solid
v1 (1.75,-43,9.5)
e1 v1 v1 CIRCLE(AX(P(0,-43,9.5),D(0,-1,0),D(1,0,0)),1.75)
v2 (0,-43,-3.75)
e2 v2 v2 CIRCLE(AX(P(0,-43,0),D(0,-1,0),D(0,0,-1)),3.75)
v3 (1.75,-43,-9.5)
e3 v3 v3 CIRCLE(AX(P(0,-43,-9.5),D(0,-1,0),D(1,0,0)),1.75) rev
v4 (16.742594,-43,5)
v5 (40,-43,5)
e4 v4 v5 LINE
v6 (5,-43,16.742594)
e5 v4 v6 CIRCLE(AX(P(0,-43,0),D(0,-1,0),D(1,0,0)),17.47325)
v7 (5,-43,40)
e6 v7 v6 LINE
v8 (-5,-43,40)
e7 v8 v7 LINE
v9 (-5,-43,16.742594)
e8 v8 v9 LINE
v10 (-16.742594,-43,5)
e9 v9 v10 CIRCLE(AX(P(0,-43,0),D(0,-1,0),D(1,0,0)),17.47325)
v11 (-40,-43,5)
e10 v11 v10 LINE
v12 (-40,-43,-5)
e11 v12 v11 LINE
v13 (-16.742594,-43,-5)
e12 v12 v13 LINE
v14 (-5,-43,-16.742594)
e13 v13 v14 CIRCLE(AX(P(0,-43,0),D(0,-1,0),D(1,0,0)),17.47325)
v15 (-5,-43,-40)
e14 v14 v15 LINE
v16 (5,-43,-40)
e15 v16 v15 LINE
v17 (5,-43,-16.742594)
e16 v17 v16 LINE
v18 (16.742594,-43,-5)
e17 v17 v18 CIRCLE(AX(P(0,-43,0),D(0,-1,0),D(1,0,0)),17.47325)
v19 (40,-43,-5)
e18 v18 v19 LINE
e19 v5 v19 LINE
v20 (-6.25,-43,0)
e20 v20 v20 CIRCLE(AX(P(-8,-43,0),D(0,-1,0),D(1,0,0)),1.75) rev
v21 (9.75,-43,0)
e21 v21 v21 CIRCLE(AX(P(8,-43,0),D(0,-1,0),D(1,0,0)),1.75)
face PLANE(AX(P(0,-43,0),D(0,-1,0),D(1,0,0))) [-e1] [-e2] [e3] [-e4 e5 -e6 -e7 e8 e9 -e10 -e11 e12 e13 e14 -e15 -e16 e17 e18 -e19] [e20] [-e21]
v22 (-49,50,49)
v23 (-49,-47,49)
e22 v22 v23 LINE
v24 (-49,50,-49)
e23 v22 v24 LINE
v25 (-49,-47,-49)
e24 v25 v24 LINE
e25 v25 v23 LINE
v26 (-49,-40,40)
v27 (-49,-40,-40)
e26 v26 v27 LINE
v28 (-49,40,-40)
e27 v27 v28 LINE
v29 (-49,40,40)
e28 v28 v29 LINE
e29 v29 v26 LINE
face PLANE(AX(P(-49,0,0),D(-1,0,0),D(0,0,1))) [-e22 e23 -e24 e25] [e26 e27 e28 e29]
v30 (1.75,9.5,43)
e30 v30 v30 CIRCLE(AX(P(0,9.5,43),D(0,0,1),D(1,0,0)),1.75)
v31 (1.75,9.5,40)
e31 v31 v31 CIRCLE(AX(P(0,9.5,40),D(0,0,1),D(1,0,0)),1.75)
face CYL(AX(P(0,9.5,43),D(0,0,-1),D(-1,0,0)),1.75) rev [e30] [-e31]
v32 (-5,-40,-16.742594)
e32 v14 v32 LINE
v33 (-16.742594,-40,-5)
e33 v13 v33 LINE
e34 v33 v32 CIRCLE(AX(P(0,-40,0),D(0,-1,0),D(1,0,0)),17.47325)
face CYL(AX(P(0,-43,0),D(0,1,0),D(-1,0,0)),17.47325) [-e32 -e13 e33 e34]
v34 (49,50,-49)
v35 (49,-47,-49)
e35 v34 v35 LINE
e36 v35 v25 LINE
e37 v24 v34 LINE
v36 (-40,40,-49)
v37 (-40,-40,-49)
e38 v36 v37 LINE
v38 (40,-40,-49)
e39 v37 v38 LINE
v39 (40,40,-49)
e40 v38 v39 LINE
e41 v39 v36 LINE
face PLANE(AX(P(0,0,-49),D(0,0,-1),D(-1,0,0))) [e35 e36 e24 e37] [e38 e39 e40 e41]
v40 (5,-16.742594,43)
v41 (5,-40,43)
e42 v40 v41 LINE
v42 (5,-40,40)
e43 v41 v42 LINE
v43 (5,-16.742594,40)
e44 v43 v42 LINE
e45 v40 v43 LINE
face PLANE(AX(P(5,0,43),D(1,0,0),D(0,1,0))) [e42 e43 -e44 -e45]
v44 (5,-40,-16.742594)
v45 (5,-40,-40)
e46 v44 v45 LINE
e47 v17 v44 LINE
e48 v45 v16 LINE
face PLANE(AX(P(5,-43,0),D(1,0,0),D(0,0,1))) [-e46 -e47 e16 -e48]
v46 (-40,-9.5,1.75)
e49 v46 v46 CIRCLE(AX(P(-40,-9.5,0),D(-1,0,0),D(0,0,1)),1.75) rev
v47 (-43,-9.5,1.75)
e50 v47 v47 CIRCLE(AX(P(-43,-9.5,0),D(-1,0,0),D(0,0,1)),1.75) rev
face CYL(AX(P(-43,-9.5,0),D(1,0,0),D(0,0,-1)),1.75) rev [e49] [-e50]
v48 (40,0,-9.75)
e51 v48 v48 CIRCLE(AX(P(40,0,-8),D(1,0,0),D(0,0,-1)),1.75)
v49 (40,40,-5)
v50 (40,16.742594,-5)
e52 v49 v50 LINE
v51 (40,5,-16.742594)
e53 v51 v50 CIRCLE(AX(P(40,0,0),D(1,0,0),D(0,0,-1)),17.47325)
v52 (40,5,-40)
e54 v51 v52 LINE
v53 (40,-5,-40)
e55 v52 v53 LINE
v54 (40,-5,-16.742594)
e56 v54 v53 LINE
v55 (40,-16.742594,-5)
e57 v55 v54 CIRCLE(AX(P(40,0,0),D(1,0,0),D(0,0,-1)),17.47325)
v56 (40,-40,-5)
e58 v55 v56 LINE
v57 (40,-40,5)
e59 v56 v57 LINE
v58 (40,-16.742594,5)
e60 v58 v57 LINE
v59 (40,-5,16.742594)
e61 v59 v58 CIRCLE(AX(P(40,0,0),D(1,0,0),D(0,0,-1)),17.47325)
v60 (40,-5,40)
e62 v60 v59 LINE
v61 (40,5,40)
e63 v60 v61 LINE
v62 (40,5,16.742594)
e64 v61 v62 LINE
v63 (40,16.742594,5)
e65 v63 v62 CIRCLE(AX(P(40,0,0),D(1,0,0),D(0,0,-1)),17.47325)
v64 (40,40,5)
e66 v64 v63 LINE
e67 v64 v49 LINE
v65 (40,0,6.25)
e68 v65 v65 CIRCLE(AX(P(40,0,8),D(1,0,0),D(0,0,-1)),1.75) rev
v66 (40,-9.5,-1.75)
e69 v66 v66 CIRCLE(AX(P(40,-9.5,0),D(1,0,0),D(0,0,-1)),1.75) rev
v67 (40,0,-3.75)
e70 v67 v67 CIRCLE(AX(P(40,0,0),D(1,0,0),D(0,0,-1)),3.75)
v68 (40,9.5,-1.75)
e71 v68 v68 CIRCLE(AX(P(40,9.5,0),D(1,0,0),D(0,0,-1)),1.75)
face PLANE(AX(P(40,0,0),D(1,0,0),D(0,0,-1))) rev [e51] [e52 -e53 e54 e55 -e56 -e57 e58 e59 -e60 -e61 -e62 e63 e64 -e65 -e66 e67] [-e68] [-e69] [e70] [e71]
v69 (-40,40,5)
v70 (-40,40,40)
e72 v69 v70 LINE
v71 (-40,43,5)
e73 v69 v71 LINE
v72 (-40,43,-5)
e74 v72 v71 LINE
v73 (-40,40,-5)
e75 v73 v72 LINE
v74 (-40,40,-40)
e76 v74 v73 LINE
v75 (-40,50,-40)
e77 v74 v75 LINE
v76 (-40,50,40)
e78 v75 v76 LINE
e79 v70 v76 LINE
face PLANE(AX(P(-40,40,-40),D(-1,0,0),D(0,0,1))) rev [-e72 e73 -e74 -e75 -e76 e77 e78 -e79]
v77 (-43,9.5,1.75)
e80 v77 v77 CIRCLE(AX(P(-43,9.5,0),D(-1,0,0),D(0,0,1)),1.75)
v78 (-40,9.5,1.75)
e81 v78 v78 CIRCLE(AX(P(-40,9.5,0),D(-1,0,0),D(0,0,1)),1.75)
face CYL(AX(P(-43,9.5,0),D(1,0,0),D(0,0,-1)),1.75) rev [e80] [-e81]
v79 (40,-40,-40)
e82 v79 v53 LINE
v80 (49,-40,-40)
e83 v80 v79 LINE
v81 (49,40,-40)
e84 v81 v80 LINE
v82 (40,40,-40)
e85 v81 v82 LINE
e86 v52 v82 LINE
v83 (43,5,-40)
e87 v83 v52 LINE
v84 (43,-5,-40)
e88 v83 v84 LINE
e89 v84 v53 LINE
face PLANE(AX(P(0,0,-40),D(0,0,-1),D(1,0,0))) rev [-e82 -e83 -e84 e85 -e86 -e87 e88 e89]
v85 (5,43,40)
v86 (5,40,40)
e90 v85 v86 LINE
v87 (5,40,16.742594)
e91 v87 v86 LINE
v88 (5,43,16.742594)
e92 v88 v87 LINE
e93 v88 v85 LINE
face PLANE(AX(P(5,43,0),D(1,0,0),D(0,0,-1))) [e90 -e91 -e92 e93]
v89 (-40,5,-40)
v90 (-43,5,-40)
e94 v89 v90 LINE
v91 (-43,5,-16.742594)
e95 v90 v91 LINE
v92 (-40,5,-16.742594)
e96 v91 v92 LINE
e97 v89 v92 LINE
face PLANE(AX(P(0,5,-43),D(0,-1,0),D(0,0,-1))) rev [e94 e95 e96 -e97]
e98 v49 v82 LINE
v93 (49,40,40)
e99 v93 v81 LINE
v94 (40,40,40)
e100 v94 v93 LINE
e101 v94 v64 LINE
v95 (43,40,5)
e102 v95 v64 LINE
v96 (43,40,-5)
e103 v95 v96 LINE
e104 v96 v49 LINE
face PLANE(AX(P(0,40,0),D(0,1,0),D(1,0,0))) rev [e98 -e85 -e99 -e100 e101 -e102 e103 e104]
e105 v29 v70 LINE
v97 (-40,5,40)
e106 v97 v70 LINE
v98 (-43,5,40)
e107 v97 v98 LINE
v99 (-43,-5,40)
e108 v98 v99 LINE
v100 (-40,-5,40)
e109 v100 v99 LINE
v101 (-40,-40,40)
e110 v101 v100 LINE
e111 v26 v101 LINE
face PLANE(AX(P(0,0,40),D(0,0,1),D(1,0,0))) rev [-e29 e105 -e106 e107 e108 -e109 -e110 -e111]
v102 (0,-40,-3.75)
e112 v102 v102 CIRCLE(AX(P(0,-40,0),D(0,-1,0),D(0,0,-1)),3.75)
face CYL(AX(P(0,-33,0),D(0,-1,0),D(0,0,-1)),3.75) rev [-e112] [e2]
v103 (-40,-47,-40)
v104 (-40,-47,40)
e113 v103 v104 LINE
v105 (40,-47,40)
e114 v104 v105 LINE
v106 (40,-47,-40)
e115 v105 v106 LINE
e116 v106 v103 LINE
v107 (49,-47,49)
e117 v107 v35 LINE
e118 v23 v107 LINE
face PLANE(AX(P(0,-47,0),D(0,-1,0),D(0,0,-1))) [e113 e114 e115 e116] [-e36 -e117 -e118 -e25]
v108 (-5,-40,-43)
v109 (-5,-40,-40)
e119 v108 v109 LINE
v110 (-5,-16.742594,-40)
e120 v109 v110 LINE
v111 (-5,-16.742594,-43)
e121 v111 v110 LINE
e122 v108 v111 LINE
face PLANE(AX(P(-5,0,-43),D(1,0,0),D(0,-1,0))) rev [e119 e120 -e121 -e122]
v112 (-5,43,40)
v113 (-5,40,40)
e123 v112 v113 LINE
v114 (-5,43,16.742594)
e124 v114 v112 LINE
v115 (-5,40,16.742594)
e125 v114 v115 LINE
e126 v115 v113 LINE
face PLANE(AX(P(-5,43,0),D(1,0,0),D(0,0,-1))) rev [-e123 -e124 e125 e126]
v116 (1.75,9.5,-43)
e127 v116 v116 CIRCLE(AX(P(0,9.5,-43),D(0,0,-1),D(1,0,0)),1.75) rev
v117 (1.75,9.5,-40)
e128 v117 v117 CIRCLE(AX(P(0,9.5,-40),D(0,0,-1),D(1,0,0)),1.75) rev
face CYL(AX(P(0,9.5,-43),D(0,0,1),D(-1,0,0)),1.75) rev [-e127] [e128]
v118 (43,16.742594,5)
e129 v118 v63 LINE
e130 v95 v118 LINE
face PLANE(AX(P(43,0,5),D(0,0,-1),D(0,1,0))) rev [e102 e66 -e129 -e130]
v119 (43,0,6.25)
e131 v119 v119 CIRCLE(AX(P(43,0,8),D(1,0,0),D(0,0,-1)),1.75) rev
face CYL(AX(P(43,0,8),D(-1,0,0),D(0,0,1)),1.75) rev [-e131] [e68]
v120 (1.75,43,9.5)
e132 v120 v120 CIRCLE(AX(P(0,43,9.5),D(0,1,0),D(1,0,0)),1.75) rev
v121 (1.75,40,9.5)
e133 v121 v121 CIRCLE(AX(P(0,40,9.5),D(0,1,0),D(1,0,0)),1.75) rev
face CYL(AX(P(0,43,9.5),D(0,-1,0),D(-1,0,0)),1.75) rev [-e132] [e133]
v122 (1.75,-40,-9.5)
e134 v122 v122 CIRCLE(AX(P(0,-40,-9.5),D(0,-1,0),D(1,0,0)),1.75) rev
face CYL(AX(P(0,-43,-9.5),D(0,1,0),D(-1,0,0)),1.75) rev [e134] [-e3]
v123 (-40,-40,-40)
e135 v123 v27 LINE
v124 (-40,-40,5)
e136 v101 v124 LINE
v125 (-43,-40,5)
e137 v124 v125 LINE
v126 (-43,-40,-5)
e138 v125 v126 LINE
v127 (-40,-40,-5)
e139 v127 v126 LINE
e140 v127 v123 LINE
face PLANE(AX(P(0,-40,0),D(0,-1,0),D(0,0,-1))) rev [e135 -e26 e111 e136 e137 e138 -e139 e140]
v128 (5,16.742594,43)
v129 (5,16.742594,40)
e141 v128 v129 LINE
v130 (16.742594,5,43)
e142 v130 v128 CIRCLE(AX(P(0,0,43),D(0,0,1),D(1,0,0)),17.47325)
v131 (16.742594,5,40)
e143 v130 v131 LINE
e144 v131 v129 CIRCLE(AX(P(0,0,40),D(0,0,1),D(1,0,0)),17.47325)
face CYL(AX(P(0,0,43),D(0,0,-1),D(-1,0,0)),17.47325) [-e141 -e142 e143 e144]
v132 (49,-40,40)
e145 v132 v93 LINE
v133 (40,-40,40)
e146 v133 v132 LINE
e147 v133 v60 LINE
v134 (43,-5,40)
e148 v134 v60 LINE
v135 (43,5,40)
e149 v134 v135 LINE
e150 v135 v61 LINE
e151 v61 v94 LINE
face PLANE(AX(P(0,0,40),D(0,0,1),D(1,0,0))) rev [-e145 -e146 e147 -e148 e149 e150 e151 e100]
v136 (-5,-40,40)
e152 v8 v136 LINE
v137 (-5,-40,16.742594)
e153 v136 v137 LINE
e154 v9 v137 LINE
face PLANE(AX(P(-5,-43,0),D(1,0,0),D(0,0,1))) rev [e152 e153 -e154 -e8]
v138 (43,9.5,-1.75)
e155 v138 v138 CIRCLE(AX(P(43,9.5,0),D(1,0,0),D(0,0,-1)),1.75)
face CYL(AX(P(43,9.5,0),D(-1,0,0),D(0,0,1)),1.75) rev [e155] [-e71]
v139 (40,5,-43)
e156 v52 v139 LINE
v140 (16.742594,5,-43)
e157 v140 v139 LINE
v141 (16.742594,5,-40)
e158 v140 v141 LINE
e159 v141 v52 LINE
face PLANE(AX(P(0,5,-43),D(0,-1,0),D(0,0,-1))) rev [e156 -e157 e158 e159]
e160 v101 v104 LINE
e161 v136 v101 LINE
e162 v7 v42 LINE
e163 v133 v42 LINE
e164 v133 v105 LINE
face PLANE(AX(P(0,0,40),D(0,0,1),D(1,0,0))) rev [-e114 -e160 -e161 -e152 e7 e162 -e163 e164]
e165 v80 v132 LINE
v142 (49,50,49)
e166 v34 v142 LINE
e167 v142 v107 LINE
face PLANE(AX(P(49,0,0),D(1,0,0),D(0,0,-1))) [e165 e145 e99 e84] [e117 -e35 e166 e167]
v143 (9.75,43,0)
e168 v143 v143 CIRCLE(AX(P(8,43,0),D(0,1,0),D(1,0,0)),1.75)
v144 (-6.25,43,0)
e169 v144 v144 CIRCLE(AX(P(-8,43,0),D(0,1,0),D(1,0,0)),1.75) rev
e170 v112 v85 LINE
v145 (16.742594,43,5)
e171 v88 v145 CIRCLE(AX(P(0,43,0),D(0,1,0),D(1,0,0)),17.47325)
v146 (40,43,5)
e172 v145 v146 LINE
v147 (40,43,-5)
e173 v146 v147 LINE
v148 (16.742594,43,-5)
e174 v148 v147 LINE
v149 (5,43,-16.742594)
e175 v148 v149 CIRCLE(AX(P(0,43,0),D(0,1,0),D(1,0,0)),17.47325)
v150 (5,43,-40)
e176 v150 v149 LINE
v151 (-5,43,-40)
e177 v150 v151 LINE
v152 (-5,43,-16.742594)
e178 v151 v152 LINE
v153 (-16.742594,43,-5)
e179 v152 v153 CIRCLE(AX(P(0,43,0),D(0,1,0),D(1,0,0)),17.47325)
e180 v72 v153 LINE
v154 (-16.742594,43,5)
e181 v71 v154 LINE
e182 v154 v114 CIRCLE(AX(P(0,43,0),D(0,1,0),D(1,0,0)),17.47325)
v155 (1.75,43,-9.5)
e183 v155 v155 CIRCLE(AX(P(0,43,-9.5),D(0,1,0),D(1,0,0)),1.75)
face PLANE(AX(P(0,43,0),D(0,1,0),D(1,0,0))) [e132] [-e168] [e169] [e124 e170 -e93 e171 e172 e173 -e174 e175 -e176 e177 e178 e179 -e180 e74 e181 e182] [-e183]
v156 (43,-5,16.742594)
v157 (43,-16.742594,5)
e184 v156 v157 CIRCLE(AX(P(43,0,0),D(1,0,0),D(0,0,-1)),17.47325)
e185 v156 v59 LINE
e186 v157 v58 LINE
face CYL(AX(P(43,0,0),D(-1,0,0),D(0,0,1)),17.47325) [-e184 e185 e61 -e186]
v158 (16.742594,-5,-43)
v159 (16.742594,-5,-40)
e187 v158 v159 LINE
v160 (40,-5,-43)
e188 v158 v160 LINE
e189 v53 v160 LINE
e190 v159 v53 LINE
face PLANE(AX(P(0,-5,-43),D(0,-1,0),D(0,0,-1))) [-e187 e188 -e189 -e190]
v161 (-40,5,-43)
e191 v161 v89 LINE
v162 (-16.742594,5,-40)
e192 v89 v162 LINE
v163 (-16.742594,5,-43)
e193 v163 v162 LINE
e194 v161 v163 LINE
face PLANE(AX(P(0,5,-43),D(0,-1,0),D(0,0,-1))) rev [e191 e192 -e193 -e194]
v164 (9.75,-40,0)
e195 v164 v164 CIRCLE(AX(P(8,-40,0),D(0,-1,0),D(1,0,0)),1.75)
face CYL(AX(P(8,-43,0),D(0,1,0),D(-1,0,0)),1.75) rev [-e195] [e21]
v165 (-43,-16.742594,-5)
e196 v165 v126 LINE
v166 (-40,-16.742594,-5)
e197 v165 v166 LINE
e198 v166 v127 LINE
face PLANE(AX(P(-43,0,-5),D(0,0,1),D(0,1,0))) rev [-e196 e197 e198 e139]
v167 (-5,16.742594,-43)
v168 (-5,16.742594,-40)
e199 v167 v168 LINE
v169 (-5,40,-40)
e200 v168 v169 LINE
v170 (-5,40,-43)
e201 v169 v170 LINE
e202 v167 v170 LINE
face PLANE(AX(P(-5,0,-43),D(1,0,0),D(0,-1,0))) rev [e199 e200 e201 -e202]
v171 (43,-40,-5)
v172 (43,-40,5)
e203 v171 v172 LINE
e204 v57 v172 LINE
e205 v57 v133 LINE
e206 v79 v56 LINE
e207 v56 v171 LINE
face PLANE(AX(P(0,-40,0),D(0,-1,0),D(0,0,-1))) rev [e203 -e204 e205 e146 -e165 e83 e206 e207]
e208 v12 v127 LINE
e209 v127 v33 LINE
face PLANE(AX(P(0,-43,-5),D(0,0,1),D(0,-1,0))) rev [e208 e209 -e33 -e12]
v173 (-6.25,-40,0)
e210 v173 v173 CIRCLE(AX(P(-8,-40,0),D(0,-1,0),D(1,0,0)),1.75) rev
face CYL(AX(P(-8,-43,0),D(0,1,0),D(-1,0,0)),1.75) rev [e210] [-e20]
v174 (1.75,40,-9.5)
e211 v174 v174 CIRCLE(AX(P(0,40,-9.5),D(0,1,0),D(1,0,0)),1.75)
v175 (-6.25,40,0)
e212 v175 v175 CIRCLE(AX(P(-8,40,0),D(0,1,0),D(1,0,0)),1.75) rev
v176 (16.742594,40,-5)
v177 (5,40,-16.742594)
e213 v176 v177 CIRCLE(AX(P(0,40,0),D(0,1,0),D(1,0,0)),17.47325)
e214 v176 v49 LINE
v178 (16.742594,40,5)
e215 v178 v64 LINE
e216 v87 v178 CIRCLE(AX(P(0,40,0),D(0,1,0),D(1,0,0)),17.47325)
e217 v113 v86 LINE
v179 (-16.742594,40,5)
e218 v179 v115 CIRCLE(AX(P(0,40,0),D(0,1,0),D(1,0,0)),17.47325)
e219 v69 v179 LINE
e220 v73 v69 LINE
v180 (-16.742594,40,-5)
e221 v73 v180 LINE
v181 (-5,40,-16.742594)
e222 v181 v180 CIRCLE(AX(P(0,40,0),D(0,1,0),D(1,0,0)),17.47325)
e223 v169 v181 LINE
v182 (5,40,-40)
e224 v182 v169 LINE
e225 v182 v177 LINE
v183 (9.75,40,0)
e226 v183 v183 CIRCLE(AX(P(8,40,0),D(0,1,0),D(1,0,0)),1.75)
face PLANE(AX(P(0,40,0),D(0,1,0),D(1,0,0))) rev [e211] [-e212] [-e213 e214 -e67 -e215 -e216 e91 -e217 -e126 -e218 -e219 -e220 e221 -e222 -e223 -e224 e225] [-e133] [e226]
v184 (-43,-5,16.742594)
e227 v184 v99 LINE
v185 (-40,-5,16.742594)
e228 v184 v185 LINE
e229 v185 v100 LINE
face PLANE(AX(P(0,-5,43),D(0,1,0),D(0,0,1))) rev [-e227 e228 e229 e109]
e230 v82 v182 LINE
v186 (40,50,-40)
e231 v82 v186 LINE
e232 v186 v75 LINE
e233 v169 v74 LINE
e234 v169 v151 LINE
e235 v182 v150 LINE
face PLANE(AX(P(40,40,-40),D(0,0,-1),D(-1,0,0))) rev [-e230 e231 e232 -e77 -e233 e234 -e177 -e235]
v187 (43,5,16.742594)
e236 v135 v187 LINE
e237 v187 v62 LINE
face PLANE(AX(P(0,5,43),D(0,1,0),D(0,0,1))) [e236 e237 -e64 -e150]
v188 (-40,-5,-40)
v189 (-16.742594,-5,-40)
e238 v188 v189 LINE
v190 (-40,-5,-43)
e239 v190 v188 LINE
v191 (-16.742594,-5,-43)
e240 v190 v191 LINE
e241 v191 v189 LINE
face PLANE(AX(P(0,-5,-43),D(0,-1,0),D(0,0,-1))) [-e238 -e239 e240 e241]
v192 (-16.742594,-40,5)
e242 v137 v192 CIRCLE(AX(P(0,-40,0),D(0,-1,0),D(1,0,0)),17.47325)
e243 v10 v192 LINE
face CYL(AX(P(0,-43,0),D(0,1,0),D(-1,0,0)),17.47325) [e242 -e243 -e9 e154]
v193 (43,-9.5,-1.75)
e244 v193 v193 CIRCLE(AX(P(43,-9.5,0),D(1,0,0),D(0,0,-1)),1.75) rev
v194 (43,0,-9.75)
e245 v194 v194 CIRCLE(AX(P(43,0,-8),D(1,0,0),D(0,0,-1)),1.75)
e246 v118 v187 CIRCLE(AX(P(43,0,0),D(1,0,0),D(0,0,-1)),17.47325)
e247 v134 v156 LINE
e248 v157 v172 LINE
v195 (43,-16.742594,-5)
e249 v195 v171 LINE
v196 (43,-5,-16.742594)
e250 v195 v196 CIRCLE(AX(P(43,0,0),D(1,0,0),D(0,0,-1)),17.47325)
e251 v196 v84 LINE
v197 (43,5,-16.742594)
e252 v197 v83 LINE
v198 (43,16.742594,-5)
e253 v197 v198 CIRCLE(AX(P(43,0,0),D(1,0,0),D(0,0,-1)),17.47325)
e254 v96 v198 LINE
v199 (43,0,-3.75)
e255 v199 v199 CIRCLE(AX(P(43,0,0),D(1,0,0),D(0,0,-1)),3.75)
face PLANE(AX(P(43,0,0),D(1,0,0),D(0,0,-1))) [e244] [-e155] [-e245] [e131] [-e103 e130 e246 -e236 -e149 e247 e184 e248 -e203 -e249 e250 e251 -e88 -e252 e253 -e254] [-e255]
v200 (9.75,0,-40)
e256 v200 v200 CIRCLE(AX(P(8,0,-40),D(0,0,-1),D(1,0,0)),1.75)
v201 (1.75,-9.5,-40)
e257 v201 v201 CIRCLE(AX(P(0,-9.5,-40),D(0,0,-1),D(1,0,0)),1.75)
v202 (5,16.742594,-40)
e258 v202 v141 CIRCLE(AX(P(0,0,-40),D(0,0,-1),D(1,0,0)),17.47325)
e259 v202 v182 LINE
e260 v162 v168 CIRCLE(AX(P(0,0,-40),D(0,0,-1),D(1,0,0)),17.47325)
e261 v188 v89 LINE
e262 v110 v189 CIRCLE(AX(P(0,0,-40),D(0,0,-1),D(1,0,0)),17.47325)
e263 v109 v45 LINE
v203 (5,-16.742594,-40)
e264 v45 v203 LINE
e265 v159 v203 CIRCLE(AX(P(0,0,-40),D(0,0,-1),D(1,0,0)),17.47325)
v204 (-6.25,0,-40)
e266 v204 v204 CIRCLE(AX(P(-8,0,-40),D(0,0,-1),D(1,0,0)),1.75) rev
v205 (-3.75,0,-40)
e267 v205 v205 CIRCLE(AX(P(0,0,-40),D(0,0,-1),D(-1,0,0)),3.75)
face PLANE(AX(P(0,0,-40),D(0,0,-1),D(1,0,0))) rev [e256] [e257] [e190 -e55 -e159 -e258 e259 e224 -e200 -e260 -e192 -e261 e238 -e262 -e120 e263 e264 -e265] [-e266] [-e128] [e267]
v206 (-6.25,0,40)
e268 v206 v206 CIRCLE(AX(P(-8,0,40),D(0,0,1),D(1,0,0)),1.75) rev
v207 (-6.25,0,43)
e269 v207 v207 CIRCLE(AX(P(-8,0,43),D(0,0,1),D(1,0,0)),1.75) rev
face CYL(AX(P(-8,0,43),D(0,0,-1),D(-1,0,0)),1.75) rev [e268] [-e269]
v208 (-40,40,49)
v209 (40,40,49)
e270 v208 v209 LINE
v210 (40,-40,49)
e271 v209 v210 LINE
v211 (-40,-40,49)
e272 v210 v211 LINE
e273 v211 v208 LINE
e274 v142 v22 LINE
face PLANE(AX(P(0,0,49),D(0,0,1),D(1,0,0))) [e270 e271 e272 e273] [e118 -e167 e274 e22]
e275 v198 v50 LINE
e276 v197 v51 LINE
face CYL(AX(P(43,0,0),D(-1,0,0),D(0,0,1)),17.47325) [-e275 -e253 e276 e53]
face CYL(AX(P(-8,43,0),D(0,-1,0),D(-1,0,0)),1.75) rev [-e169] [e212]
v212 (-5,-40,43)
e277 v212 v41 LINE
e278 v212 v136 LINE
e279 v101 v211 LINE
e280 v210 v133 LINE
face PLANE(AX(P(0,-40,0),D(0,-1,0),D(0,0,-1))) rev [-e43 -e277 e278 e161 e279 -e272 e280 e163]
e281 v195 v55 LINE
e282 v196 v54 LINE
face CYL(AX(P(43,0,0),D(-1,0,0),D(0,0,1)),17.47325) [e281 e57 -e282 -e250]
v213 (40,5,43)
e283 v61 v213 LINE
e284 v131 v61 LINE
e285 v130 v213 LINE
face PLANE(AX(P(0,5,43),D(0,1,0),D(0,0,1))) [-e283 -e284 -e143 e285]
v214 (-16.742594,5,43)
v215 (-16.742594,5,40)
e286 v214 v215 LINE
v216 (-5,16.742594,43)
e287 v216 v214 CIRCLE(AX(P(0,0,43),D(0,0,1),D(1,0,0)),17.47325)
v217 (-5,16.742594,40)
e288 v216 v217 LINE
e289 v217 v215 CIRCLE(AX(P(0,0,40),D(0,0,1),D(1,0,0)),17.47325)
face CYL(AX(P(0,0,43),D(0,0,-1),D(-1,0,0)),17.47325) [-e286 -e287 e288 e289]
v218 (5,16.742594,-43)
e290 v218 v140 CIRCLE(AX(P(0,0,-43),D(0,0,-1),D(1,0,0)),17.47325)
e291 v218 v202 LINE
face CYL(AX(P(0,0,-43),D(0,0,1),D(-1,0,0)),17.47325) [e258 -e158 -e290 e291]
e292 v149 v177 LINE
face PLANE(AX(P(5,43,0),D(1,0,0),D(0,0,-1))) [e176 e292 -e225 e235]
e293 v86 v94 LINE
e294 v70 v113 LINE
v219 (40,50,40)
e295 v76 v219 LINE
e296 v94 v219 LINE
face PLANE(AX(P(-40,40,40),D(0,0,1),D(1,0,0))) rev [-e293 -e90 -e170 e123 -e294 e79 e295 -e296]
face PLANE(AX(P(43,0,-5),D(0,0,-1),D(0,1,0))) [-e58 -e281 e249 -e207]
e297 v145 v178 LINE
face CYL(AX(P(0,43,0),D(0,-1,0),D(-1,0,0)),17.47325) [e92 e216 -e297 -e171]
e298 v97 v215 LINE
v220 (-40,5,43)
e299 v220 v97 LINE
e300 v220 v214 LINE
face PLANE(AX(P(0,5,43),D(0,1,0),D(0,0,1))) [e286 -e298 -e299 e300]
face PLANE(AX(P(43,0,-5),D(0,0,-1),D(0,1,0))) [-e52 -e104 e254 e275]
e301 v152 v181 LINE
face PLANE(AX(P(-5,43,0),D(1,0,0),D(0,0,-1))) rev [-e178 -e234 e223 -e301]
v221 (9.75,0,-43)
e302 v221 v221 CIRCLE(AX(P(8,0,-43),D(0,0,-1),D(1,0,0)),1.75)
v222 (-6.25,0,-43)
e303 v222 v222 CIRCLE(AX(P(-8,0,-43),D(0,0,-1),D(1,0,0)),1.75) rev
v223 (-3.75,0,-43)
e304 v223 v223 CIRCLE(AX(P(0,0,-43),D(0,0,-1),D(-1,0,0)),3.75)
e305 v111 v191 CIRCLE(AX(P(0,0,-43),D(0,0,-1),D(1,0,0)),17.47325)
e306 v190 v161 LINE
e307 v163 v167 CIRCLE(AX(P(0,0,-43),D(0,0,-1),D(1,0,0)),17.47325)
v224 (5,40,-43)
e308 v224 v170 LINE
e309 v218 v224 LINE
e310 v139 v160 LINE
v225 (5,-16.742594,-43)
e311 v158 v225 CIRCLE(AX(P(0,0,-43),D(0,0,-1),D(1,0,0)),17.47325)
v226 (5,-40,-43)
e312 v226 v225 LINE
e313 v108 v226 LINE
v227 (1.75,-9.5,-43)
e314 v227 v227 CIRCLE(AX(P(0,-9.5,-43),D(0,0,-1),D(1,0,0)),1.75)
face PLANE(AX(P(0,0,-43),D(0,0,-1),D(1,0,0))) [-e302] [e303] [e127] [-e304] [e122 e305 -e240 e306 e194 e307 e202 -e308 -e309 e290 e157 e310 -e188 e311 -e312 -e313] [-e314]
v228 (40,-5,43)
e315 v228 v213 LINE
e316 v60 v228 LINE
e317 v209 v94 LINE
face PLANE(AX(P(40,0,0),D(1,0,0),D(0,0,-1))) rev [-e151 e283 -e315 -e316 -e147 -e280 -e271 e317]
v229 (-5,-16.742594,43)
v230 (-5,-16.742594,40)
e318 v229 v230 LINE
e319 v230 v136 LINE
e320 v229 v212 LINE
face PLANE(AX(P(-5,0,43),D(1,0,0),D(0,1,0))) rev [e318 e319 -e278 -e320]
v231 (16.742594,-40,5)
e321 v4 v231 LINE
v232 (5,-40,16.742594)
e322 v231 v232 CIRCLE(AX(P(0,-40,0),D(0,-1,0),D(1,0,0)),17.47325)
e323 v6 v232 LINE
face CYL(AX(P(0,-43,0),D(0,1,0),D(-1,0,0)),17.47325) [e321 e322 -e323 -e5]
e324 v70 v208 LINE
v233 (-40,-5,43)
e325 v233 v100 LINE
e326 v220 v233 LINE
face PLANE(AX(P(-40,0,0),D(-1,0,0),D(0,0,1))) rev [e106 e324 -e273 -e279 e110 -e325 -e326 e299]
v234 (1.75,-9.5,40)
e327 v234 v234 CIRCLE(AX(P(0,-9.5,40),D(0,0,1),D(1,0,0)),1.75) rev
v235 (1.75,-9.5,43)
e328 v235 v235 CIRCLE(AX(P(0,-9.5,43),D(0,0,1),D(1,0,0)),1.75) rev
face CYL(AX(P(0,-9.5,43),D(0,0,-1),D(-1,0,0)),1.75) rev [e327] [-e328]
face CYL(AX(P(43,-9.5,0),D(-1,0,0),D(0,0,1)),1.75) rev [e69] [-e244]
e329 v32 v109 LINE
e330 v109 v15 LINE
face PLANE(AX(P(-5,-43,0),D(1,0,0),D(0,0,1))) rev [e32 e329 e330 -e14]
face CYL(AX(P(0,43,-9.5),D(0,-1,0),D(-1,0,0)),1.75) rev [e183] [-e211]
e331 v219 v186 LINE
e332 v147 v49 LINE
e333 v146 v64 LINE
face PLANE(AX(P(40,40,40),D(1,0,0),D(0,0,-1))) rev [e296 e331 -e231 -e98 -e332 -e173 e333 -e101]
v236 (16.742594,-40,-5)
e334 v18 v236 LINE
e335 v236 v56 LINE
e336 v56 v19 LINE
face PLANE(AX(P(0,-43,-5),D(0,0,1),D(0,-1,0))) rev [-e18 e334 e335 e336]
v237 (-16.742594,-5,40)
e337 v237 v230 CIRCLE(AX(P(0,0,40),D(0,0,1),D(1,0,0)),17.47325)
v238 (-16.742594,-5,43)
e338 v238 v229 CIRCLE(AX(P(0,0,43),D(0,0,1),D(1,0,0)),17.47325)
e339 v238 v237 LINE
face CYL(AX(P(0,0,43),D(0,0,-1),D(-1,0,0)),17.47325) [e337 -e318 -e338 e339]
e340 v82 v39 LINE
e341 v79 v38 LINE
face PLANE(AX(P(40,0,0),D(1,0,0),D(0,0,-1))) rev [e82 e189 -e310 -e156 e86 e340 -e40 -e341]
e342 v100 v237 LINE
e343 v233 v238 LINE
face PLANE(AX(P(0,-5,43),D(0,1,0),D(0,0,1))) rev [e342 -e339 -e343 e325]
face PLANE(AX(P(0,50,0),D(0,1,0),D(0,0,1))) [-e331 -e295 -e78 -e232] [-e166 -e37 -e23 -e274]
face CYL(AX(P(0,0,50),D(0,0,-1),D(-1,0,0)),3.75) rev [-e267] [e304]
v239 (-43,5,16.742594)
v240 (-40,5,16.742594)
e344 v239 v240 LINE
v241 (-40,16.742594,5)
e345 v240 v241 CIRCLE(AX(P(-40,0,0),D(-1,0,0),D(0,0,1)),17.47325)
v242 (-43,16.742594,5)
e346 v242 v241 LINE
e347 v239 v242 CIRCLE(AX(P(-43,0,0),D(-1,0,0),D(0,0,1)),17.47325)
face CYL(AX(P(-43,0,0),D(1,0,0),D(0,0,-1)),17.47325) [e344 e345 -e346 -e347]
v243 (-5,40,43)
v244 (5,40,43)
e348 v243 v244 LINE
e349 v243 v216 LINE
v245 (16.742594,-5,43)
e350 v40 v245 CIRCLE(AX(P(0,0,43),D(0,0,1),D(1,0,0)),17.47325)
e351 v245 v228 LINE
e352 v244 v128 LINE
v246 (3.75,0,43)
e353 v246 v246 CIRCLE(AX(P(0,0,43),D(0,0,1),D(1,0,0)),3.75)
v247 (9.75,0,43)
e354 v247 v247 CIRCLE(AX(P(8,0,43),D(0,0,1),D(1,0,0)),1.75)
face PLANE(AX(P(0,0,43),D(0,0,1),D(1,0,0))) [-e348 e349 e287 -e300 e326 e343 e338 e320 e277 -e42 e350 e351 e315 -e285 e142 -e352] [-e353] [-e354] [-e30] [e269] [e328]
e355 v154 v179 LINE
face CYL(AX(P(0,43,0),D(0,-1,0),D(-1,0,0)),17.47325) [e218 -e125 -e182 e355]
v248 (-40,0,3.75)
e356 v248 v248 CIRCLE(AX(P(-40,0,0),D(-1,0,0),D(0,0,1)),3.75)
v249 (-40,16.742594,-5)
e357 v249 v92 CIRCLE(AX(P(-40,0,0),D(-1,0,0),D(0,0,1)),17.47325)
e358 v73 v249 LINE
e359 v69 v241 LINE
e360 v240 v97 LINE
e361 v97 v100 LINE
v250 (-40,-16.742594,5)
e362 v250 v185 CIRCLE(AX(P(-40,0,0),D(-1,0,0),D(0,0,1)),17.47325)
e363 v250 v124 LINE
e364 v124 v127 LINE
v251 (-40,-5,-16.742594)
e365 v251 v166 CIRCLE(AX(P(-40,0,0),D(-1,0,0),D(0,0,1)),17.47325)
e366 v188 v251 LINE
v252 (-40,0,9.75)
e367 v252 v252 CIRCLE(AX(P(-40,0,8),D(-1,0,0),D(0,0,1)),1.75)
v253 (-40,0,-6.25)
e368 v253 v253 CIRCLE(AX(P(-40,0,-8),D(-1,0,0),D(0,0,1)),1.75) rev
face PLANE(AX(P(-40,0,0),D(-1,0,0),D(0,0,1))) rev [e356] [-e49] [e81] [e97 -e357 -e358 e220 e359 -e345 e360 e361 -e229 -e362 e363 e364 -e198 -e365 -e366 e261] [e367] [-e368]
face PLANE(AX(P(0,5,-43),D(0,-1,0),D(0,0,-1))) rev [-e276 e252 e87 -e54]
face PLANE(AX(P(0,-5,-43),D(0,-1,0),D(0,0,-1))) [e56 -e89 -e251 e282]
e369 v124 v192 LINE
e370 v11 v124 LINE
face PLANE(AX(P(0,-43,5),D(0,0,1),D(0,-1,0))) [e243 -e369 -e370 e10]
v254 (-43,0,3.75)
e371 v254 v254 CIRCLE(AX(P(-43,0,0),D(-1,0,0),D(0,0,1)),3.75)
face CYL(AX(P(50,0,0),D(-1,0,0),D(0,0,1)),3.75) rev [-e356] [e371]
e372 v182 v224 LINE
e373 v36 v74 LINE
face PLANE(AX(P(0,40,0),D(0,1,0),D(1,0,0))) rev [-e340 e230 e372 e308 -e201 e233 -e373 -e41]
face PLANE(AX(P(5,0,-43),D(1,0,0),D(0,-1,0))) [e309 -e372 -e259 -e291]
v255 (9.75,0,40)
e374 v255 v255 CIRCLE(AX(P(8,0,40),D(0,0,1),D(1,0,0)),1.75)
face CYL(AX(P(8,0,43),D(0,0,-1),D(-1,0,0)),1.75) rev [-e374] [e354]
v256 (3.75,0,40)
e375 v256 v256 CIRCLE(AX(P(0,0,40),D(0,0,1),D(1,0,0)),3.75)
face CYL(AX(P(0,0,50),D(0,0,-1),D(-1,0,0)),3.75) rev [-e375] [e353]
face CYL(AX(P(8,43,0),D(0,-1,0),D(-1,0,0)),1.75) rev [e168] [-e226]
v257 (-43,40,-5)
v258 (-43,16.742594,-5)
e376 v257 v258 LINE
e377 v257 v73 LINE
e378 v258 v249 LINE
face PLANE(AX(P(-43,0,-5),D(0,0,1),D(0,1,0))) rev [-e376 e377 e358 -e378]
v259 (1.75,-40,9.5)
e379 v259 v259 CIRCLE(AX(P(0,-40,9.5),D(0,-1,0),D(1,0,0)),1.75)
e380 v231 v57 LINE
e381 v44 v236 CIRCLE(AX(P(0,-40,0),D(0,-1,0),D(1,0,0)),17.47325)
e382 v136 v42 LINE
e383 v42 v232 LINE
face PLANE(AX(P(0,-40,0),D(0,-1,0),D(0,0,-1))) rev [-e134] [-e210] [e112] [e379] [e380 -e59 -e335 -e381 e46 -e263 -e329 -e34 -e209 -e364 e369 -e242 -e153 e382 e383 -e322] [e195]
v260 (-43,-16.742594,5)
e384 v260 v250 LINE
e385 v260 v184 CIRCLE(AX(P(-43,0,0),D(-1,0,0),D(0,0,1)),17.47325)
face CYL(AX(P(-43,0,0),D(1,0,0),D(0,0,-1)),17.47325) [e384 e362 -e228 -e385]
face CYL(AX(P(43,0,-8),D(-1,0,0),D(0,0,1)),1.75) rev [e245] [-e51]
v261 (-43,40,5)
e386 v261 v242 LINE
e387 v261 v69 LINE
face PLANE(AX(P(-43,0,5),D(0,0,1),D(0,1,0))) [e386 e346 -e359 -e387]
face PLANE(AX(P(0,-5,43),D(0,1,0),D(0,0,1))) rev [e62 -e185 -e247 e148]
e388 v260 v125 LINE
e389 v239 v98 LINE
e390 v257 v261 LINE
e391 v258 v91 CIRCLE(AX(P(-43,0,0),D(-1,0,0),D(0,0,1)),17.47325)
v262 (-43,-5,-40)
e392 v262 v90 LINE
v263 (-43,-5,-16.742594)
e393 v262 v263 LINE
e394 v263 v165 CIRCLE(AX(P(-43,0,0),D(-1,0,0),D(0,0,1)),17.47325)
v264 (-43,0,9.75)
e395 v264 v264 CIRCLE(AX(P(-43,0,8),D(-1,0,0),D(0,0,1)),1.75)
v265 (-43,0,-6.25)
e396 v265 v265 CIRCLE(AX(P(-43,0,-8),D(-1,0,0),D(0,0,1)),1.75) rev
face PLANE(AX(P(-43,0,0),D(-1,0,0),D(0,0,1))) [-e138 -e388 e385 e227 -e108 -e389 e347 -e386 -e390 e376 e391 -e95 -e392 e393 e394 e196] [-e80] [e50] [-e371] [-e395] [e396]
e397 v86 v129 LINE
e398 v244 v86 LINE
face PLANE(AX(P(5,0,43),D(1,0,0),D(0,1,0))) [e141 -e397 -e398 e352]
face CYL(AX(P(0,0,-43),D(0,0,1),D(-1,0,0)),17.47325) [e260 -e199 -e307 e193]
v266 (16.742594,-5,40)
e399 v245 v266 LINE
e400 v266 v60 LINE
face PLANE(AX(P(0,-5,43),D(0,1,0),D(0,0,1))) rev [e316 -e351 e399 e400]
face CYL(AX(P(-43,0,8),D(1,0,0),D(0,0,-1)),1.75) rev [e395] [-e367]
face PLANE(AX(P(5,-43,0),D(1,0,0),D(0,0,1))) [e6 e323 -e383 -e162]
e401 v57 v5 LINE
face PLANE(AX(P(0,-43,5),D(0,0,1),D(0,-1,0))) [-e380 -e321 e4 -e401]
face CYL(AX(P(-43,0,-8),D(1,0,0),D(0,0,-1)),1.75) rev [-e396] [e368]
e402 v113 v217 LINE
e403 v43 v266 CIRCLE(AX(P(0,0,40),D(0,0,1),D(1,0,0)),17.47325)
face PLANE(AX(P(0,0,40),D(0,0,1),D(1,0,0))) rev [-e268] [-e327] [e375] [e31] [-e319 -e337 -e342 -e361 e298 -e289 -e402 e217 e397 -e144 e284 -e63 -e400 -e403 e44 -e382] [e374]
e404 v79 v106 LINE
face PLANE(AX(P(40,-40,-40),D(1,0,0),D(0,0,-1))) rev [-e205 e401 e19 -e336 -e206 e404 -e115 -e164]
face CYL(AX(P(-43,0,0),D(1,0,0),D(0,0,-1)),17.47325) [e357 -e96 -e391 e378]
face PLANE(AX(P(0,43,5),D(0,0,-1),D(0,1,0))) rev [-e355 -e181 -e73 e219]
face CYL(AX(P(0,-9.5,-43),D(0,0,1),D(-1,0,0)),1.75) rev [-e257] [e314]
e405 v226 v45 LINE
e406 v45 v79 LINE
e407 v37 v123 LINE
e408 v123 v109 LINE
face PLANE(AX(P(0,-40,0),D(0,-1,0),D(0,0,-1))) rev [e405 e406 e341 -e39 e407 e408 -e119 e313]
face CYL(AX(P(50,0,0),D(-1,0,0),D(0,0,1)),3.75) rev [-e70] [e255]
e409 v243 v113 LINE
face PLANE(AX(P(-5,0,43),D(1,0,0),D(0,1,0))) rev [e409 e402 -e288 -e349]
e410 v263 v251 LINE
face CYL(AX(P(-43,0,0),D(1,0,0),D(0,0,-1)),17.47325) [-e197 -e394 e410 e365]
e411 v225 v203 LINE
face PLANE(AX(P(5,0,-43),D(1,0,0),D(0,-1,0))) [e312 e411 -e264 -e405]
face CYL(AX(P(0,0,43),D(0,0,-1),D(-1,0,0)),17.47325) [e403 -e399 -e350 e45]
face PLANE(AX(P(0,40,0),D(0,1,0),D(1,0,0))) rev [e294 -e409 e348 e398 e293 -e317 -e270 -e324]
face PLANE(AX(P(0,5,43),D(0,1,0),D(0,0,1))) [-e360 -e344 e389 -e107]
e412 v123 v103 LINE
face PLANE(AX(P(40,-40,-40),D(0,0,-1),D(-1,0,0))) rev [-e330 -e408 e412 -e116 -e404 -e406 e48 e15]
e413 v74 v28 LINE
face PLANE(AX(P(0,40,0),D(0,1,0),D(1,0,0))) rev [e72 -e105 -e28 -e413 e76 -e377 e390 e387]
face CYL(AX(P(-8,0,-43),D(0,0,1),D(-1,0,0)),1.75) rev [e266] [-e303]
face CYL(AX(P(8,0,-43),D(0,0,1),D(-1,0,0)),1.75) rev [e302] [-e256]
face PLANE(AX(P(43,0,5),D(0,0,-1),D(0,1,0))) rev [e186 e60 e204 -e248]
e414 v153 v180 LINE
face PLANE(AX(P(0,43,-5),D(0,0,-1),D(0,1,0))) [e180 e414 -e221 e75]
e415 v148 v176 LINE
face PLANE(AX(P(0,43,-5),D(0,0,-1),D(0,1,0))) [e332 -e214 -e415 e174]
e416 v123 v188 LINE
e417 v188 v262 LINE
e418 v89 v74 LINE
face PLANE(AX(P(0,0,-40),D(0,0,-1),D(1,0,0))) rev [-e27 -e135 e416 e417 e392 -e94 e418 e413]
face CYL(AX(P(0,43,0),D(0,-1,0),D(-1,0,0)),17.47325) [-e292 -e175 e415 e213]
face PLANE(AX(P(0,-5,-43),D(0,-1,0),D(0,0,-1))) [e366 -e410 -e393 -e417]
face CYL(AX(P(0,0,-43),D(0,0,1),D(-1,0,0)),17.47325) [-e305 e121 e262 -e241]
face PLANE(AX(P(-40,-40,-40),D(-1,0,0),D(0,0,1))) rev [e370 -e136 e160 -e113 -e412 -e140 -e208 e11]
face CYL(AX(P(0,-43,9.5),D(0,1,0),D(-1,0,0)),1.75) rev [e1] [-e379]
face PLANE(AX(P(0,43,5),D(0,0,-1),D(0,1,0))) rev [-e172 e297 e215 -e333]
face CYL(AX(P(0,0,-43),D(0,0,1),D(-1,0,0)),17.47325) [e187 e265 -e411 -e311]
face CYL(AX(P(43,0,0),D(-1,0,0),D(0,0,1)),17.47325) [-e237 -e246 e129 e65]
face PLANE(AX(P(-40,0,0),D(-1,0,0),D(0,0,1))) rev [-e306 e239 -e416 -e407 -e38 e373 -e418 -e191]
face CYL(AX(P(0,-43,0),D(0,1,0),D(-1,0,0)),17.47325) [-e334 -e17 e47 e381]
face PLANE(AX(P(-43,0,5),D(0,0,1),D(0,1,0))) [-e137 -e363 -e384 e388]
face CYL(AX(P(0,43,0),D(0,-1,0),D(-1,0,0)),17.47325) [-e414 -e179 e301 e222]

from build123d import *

# Parameters (mm, degrees)
SKETCH2_R                  = 1.75
SKETCH2_W                  = 10
SKETCH2_H                  = 10
BOSS_EXTRUDE1_DEPTH        = 3
CIRPATTERN1_COUNT          = 4
CIRPATTERN2_START          = 40
CIRPATTERN2_OUTLINE_R      = 1.75
CIRPATTERN2_DEPTH          = 3
CIRPATTERN2_START_2        = -43
CIRPATTERN2_2_OUTLINE_R    = 1.75
CIRPATTERN2_2_DEPTH        = 3
CIRPATTERN2_3_OUTLINE_R    = 1.75
CIRPATTERN2_3_DEPTH        = 3
CIRPATTERN2_4_OUTLINE_R    = 1.75
CIRPATTERN2_4_DEPTH        = 3
BOSS_EXTRUDE2_DEPTH        = 50
BOSS_EXTRUDE2_DEPTH_BACK   = 50
SKETCH3_W                  = 10
SKETCH3_H                  = 10
BOSS_EXTRUDE2_2_DEPTH      = 50
BOSS_EXTRUDE2_2_DEPTH_BACK = 50
BOSS_EXTRUDE2_3_DEPTH      = 50
BOSS_EXTRUDE2_3_DEPTH_BACK = 50
BOSS_EXTRUDE2_4_DEPTH      = 50
BOSS_EXTRUDE2_4_DEPTH_BACK = 50
SKETCH4_W                  = 100
SKETCH4_H                  = 100
SKETCH4_W_2                = 80
SKETCH4_H_2                = 80
BOSS_EXTRUDE3_DEPTH        = 10
SKETCH5_W                  = 100
SKETCH5_H                  = 100
SKETCH5_W_2                = 80
SKETCH5_H_2                = 80
BOSS_EXTRUDE4_DEPTH        = 10
SKETCH7_R                  = 3.75
CUT_EXTRUDE2_DEPTH         = 10
SKETCH8_R                  = 3.75
CUT_EXTRUDE3_DEPTH         = 117.828934772
SKETCH9_R                  = 3.75
CUT_EXTRUDE4_DEPTH         = 117.828934772
SKETCH10_W                 = 100
SKETCH10_H                 = 100
CUT_EXTRUDE5_DEPTH         = 3
SKETCH11_W                 = 100
SKETCH11_H                 = 97
CUT_EXTRUDE6_DEPTH         = 1
SKETCH12_W                 = 99
SKETCH12_H                 = 97
CUT_EXTRUDE7_DEPTH         = 1
SKETCH13_W                 = 99
SKETCH13_H                 = 97
CUT_EXTRUDE8_DEPTH         = 1
SKETCH14_W                 = 98
SKETCH14_H                 = 97
CUT_EXTRUDE9_DEPTH         = 1


# Read off the part's stored shape, not the designer's step: CirPattern2
with BuildPart() as part:
    # Sketch2 → Boss-Extrude1 (new body)
    # profile 1 of 13: a face of its own
    with BuildSketch(Plane.XY.offset(40)):
        with BuildLine():
            ThreePointArc((5, -16.74259435), (0, -17.47325), (-5, -16.74259435))
            Line((-5, -16.74259435), (-5, -50))
            Line((-5, -50), (5, -50))
            Line((5, -50), (5, -16.74259435))
        make_face()
    # profile 2 of 13: a face of its own
    with BuildSketch(Plane.XY.offset(40)):
        with BuildLine():
            Line((5, -5), (-5, -5))
            Line((-5, -5), (-5, -16.74259435))
            ThreePointArc((-5, -16.74259435), (0, -17.47325), (5, -16.74259435))
            Line((5, -16.74259435), (5, -5))
        make_face()
        with Locations((0, -9.5)):
            Circle(SKETCH2_R, mode=Mode.SUBTRACT)
    # profile 3 of 13: a face of its own
    with BuildSketch(Plane.XY.offset(40)):
        with BuildLine():
            Line((16.74259435, -5), (5, -5))
            Line((5, -5), (5, -16.74259435))
            ThreePointArc((5, -16.74259435), (12.355453564, -12.355453564), (16.74259435, -5))
        make_face()
    # profile 4 of 13: a face of its own
    with BuildSketch(Plane.XY.offset(40)):
        with BuildLine():
            Line((5, 5), (5, -5))
            Line((5, -5), (16.74259435, -5))
            ThreePointArc((16.74259435, -5), (17.289621197, -2.526551883), (17.47325, 0))
            ThreePointArc((17.47325, 0), (17.289621197, 2.526551883), (16.74259435, 5))
            Line((16.74259435, 5), (5, 5))
        make_face()
        with Locations((8, 0)):
            Circle(SKETCH2_R, mode=Mode.SUBTRACT)
    # profile 5 of 13: a face of its own
    with BuildSketch(Plane.XY.offset(40)):
        Rectangle(SKETCH2_W, SKETCH2_H)
    # profile 6 of 13: a face of its own
    with BuildSketch(Plane.XY.offset(40)):
        with BuildLine():
            Line((-5, -5), (-16.74259435, -5))
            ThreePointArc((-16.74259435, -5), (-12.355453564, -12.355453564), (-5, -16.74259435))
            Line((-5, -16.74259435), (-5, -5))
        make_face()
    # profile 7 of 13: a face of its own
    with BuildSketch(Plane.XY.offset(40)):
        with BuildLine():
            ThreePointArc((-16.74259435, 5), (-17.47325, 0), (-16.74259435, -5))
            Line((-16.74259435, -5), (-5, -5))
            Line((-5, -5), (-5, 5))
            Line((-5, 5), (-16.74259435, 5))
        make_face()
        with Locations((-8, 0)):
            Circle(SKETCH2_R, mode=Mode.SUBTRACT)
    # profile 8 of 13: a face of its own
    with BuildSketch(Plane.XY.offset(40)):
        with BuildLine():
            ThreePointArc((-5, 16.74259435), (-12.355453564, 12.355453564), (-16.74259435, 5))
            Line((-16.74259435, 5), (-5, 5))
            Line((-5, 5), (-5, 16.74259435))
        make_face()
    # profile 9 of 13: a face of its own
    with BuildSketch(Plane.XY.offset(40)):
        with BuildLine():
            Line((-5, 16.74259435), (-5, 5))
            Line((-5, 5), (5, 5))
            Line((5, 5), (5, 16.74259435))
            ThreePointArc((5, 16.74259435), (0, 17.47325), (-5, 16.74259435))
        make_face()
        with Locations((0, 9.5)):
            Circle(SKETCH2_R, mode=Mode.SUBTRACT)
    # profile 10 of 13: a face of its own
    with BuildSketch(Plane.XY.offset(40)):
        with BuildLine():
            Line((5, 16.74259435), (5, 5))
            Line((5, 5), (16.74259435, 5))
            ThreePointArc((16.74259435, 5), (12.355453564, 12.355453564), (5, 16.74259435))
        make_face()
    # profile 11 of 13: a face of its own
    with BuildSketch(Plane.XY.offset(40)):
        with BuildLine():
            ThreePointArc((17.47325, 0), (17.289621197, -2.526551883), (16.74259435, -5))
            Line((16.74259435, -5), (50, -5))
            Line((50, -5), (50, 5))
            Line((50, 5), (16.74259435, 5))
            ThreePointArc((16.74259435, 5), (17.289621197, 2.526551883), (17.47325, 0))
        make_face()
    # profile 12 of 13: a face of its own
    with BuildSketch(Plane.XY.offset(40)):
        with BuildLine():
            Line((-50, 5), (-50, -5))
            Line((-50, -5), (-16.74259435, -5))
            ThreePointArc((-16.74259435, -5), (-17.47325, 0), (-16.74259435, 5))
            Line((-16.74259435, 5), (-50, 5))
        make_face()
    # profile 13 of 13: a face of its own
    with BuildSketch(Plane.XY.offset(40)):
        with BuildLine():
            Line((-5, 50), (-5, 16.74259435))
            ThreePointArc((-5, 16.74259435), (0, 17.47325), (5, 16.74259435))
            Line((5, 16.74259435), (5, 50))
            Line((5, 50), (-5, 50))
        make_face()
    extrude(amount=BOSS_EXTRUDE1_DEPTH)


with BuildPart() as cirpattern1_1:
    # CirPattern1: pattern copy
    add(part.part.rotate(Axis((0, 0, 0), (1, 0, 0)), 1 * 360 / CIRPATTERN1_COUNT))


with BuildPart() as cirpattern1_2:
    # CirPattern1: pattern copy
    add(part.part.rotate(Axis((0, 0, 0), (1, 0, 0)), 2 * 360 / CIRPATTERN1_COUNT))


with BuildPart() as cirpattern1_3:
    # CirPattern1: pattern copy
    add(part.part.rotate(Axis((0, 0, 0), (1, 0, 0)), 3 * 360 / CIRPATTERN1_COUNT))


with BuildPart() as body_5:
    # CirPattern2 outline → CirPattern2 (new body)
    with BuildSketch(Plane.XY.offset(CIRPATTERN2_START)):
        with BuildLine():
            ThreePointArc((5, -16.74259435), (12.355453564, -12.355453564), (16.74259435, -5))
            Line((16.74259435, -5), (50, -5))
            Line((50, -5), (50, 5))
            Line((50, 5), (16.74259435, 5))
            ThreePointArc((16.74259435, 5), (12.355453564, 12.355453564), (5, 16.74259435))
            Line((5, 16.74259435), (5, 50))
            Line((5, 50), (-5, 50))
            Line((-5, 50), (-5, 16.74259435))
            ThreePointArc((-5, 16.74259435), (-12.355453564, 12.355453564), (-16.74259435, 5))
            Line((-16.74259435, 5), (-50, 5))
            Line((-50, 5), (-50, -5))
            Line((-50, -5), (-16.74259435, -5))
            ThreePointArc((-16.74259435, -5), (-12.355453564, -12.355453564), (-5, -16.74259435))
            Line((-5, -16.74259435), (-5, -50))
            Line((-5, -50), (5, -50))
            Line((5, -50), (5, -16.74259435))
        make_face()
        with Locations((0, -9.5)):
            Circle(CIRPATTERN2_OUTLINE_R, mode=Mode.SUBTRACT)
        with Locations((-8, 0)):
            Circle(CIRPATTERN2_OUTLINE_R, mode=Mode.SUBTRACT)
        with Locations((8, 0)):
            Circle(CIRPATTERN2_OUTLINE_R, mode=Mode.SUBTRACT)
        with Locations((0, 9.5)):
            Circle(CIRPATTERN2_OUTLINE_R, mode=Mode.SUBTRACT)
    extrude(amount=CIRPATTERN2_DEPTH)


with BuildPart() as body_6:
    # CirPattern2 2 outline → CirPattern2 2 (new body)
    with BuildSketch(Plane.YZ.offset(CIRPATTERN2_START_2)):
        with BuildLine():
            Line((-5, 50), (-5, 16.74259435))
            ThreePointArc((-5, 16.74259435), (-12.355453564, 12.355453564), (-16.74259435, 5))
            Line((-16.74259435, 5), (-50, 5))
            Line((-50, 5), (-50, -5))
            Line((-50, -5), (-16.74259435, -5))
            ThreePointArc((-16.74259435, -5), (-12.355453564, -12.355453564), (-5, -16.74259435))
            Line((-5, -16.74259435), (-5, -50))
            Line((-5, -50), (5, -50))
            Line((5, -50), (5, -16.74259435))
            ThreePointArc((5, -16.74259435), (12.355453564, -12.355453564), (16.74259435, -5))
            Line((16.74259435, -5), (50, -5))
            Line((50, -5), (50, 5))
            Line((50, 5), (16.74259435, 5))
            ThreePointArc((16.74259435, 5), (12.355453564, 12.355453564), (5, 16.74259435))
            Line((5, 16.74259435), (5, 50))
            Line((5, 50), (-5, 50))
        make_face()
        with Locations((0, -8)):
            Circle(CIRPATTERN2_2_OUTLINE_R, mode=Mode.SUBTRACT)
        with Locations((-9.5, 0)):
            Circle(CIRPATTERN2_2_OUTLINE_R, mode=Mode.SUBTRACT)
        with Locations((9.5, 0)):
            Circle(CIRPATTERN2_2_OUTLINE_R, mode=Mode.SUBTRACT)
        with Locations((0, 8)):
            Circle(CIRPATTERN2_2_OUTLINE_R, mode=Mode.SUBTRACT)
    extrude(amount=CIRPATTERN2_2_DEPTH)


with BuildPart() as body_7:
    # CirPattern2 3 outline → CirPattern2 3 (new body)
    with BuildSketch(Plane.YZ.offset(CIRPATTERN2_START)):
        with BuildLine():
            ThreePointArc((-16.74259435, -5), (-12.355453564, -12.355453564), (-5, -16.74259435))
            Line((-5, -16.74259435), (-5, -50))
            Line((-5, -50), (5, -50))
            Line((5, -50), (5, -16.74259435))
            ThreePointArc((5, -16.74259435), (12.355453564, -12.355453564), (16.74259435, -5))
            Line((16.74259435, -5), (50, -5))
            Line((50, -5), (50, 5))
            Line((50, 5), (16.74259435, 5))
            ThreePointArc((16.74259435, 5), (12.355453564, 12.355453564), (5, 16.74259435))
            Line((5, 16.74259435), (5, 50))
            Line((5, 50), (-5, 50))
            Line((-5, 50), (-5, 16.74259435))
            ThreePointArc((-5, 16.74259435), (-12.355453564, 12.355453564), (-16.74259435, 5))
            Line((-16.74259435, 5), (-50, 5))
            Line((-50, 5), (-50, -5))
            Line((-50, -5), (-16.74259435, -5))
        make_face()
        with Locations((0, -8)):
            Circle(CIRPATTERN2_3_OUTLINE_R, mode=Mode.SUBTRACT)
        with Locations((-9.5, 0)):
            Circle(CIRPATTERN2_3_OUTLINE_R, mode=Mode.SUBTRACT)
        with Locations((9.5, 0)):
            Circle(CIRPATTERN2_3_OUTLINE_R, mode=Mode.SUBTRACT)
        with Locations((0, 8)):
            Circle(CIRPATTERN2_3_OUTLINE_R, mode=Mode.SUBTRACT)
    extrude(amount=CIRPATTERN2_3_DEPTH)


with BuildPart() as body_8:
    # CirPattern2 4 outline → CirPattern2 4 (new body)
    with BuildSketch(Plane.XY.offset(CIRPATTERN2_START_2)):
        with BuildLine():
            Line((50, 5), (16.74259435, 5))
            ThreePointArc((16.74259435, 5), (12.355453564, 12.355453564), (5, 16.74259435))
            Line((5, 16.74259435), (5, 50))
            Line((5, 50), (-5, 50))
            Line((-5, 50), (-5, 16.74259435))
            ThreePointArc((-5, 16.74259435), (-12.355453564, 12.355453564), (-16.74259435, 5))
            Line((-16.74259435, 5), (-50, 5))
            Line((-50, 5), (-50, -5))
            Line((-50, -5), (-16.74259435, -5))
            ThreePointArc((-16.74259435, -5), (-12.355453564, -12.355453564), (-5, -16.74259435))
            Line((-5, -16.74259435), (-5, -50))
            Line((-5, -50), (5, -50))
            Line((5, -50), (5, -16.74259435))
            ThreePointArc((5, -16.74259435), (12.355453564, -12.355453564), (16.74259435, -5))
            Line((16.74259435, -5), (50, -5))
            Line((50, -5), (50, 5))
        make_face()
        with Locations((0, -9.5)):
            Circle(CIRPATTERN2_4_OUTLINE_R, mode=Mode.SUBTRACT)
        with Locations((-8, 0)):
            Circle(CIRPATTERN2_4_OUTLINE_R, mode=Mode.SUBTRACT)
        with Locations((8, 0)):
            Circle(CIRPATTERN2_4_OUTLINE_R, mode=Mode.SUBTRACT)
        with Locations((0, 9.5)):
            Circle(CIRPATTERN2_4_OUTLINE_R, mode=Mode.SUBTRACT)
    extrude(amount=CIRPATTERN2_4_DEPTH)


with BuildPart() as body_9:
    # Sketch3 → Boss-Extrude2 (new, two sides: drawn at the far end of the back side and taken through both)
    with BuildSketch(Plane(origin=(0, 0, 0), x_dir=(1, 0, 0), z_dir=(0, 1, 0)).offset(-BOSS_EXTRUDE2_DEPTH_BACK)):
        with Locations((-45, -45)):
            Rectangle(SKETCH3_W, SKETCH3_H)
    extrude(amount=BOSS_EXTRUDE2_DEPTH + BOSS_EXTRUDE2_DEPTH_BACK)


with BuildPart() as body_10:
    # Sketch3 → Boss-Extrude2 2 (new, two sides: drawn at the far end of the back side and taken through both)
    with BuildSketch(Plane(origin=(0, 0, 0), x_dir=(1, 0, 0), z_dir=(0, 1, 0)).offset(-BOSS_EXTRUDE2_2_DEPTH_BACK)):
        with Locations((45, -45)):
            Rectangle(SKETCH3_W, SKETCH3_H)
    extrude(amount=BOSS_EXTRUDE2_2_DEPTH + BOSS_EXTRUDE2_2_DEPTH_BACK)


with BuildPart() as body_11:
    # Sketch3 → Boss-Extrude2 3 (new, two sides: drawn at the far end of the back side and taken through both)
    with BuildSketch(Plane(origin=(0, 0, 0), x_dir=(1, 0, 0), z_dir=(0, 1, 0)).offset(-BOSS_EXTRUDE2_3_DEPTH_BACK)):
        with Locations((45, 45)):
            Rectangle(SKETCH3_W, SKETCH3_H)
    extrude(amount=BOSS_EXTRUDE2_3_DEPTH + BOSS_EXTRUDE2_3_DEPTH_BACK)


with BuildPart() as body_12:
    # Sketch3 → Boss-Extrude2 4 (new, two sides: drawn at the far end of the back side and taken through both)
    with BuildSketch(Plane(origin=(0, 0, 0), x_dir=(1, 0, 0), z_dir=(0, 1, 0)).offset(-BOSS_EXTRUDE2_4_DEPTH_BACK)):
        with Locations((-45, 45)):
            Rectangle(SKETCH3_W, SKETCH3_H)
    extrude(amount=BOSS_EXTRUDE2_4_DEPTH + BOSS_EXTRUDE2_4_DEPTH_BACK)


with BuildPart() as part_1:
    add(part.part)

    add(cirpattern1_1.part)  # Boss-Extrude3 merges CirPattern1_1

    add(cirpattern1_2.part)  # Boss-Extrude3 merges CirPattern1_2

    add(body_5.part)  # Boss-Extrude3 merges body 5

    add(body_6.part)  # Boss-Extrude3 merges body 6

    add(body_7.part)  # Boss-Extrude3 merges body 7

    add(body_8.part)  # Boss-Extrude3 merges body 8

    add(body_9.part)  # Boss-Extrude3 merges body 9

    add(body_10.part)  # Boss-Extrude3 merges body 10

    add(body_11.part)  # Boss-Extrude3 merges body 11

    add(body_12.part)  # Boss-Extrude3 merges body 12
    # Sketch4 → Boss-Extrude3 (add)
    with BuildSketch(Plane.XZ.offset(50)):
        Rectangle(SKETCH4_W, SKETCH4_H)
        Rectangle(SKETCH4_W_2, SKETCH4_H_2, mode=Mode.SUBTRACT)
    extrude(amount=-BOSS_EXTRUDE3_DEPTH)

    add(cirpattern1_3.part)  # Boss-Extrude4 merges CirPattern1_3
    # Sketch5 → Boss-Extrude4 (add)
    with BuildSketch(Plane(origin=(0, 50, 0), x_dir=(1, 0, 0), z_dir=(0, 1, 0))):
        Rectangle(SKETCH5_W, SKETCH5_H)
        Rectangle(SKETCH5_W_2, SKETCH5_H_2, mode=Mode.SUBTRACT)
    extrude(amount=-BOSS_EXTRUDE4_DEPTH)

    # Sketch7 → Cut-Extrude2 (cut)
    with BuildSketch(Plane.XZ.offset(43)):
        with Locations(Location((0, 0, 0), (0, 0, 270))):
            Circle(SKETCH7_R)
    extrude(amount=-CUT_EXTRUDE2_DEPTH, mode=Mode.SUBTRACT)

    # Sketch8 → Cut-Extrude3 (cut, through all)
    with BuildSketch(Plane.ZY.offset(43)):
        Circle(SKETCH8_R)
    extrude(amount=-CUT_EXTRUDE3_DEPTH, mode=Mode.SUBTRACT)

    # Sketch9 → Cut-Extrude4 (cut, through all)
    with BuildSketch(Plane(origin=(0, 0, -43), x_dir=(-1, 0, 0), z_dir=(0, 0, -1))):
        Circle(SKETCH9_R)
    extrude(amount=-CUT_EXTRUDE4_DEPTH, mode=Mode.SUBTRACT)

    # Sketch10 → Cut-Extrude5 (cut)
    with BuildSketch(Plane.XZ.offset(50)):
        Rectangle(SKETCH10_W, SKETCH10_H)
    extrude(amount=-CUT_EXTRUDE5_DEPTH, mode=Mode.SUBTRACT)

    # Sketch11 → Cut-Extrude6 (cut)
    with BuildSketch(Plane.ZY.offset(50)):
        with Locations((0, 1.5)):
            Rectangle(SKETCH11_W, SKETCH11_H)
    extrude(amount=-CUT_EXTRUDE6_DEPTH, mode=Mode.SUBTRACT)

    # Sketch12 → Cut-Extrude7 (cut)
    with BuildSketch(Plane.XY.offset(50)):
        with Locations((0.5, 1.5)):
            Rectangle(SKETCH12_W, SKETCH12_H)
    extrude(amount=-CUT_EXTRUDE7_DEPTH, mode=Mode.SUBTRACT)

    # Sketch13 → Cut-Extrude8 (cut)
    with BuildSketch(Plane(origin=(50, 0, 0), x_dir=(0, 0, -1), z_dir=(1, 0, 0))):
        with Locations((0.5, 1.5)):
            Rectangle(SKETCH13_W, SKETCH13_H)
    extrude(amount=-CUT_EXTRUDE8_DEPTH, mode=Mode.SUBTRACT)

    # Sketch14 → Cut-Extrude9 (cut)
    with BuildSketch(Plane(origin=(0, 0, -50), x_dir=(-1, 0, 0), z_dir=(0, 0, -1))):
        with Locations((0, 1.5)):
            Rectangle(SKETCH14_W, SKETCH14_H)
    extrude(amount=-CUT_EXTRUDE9_DEPTH, mode=Mode.SUBTRACT)


solid = part_1.part
